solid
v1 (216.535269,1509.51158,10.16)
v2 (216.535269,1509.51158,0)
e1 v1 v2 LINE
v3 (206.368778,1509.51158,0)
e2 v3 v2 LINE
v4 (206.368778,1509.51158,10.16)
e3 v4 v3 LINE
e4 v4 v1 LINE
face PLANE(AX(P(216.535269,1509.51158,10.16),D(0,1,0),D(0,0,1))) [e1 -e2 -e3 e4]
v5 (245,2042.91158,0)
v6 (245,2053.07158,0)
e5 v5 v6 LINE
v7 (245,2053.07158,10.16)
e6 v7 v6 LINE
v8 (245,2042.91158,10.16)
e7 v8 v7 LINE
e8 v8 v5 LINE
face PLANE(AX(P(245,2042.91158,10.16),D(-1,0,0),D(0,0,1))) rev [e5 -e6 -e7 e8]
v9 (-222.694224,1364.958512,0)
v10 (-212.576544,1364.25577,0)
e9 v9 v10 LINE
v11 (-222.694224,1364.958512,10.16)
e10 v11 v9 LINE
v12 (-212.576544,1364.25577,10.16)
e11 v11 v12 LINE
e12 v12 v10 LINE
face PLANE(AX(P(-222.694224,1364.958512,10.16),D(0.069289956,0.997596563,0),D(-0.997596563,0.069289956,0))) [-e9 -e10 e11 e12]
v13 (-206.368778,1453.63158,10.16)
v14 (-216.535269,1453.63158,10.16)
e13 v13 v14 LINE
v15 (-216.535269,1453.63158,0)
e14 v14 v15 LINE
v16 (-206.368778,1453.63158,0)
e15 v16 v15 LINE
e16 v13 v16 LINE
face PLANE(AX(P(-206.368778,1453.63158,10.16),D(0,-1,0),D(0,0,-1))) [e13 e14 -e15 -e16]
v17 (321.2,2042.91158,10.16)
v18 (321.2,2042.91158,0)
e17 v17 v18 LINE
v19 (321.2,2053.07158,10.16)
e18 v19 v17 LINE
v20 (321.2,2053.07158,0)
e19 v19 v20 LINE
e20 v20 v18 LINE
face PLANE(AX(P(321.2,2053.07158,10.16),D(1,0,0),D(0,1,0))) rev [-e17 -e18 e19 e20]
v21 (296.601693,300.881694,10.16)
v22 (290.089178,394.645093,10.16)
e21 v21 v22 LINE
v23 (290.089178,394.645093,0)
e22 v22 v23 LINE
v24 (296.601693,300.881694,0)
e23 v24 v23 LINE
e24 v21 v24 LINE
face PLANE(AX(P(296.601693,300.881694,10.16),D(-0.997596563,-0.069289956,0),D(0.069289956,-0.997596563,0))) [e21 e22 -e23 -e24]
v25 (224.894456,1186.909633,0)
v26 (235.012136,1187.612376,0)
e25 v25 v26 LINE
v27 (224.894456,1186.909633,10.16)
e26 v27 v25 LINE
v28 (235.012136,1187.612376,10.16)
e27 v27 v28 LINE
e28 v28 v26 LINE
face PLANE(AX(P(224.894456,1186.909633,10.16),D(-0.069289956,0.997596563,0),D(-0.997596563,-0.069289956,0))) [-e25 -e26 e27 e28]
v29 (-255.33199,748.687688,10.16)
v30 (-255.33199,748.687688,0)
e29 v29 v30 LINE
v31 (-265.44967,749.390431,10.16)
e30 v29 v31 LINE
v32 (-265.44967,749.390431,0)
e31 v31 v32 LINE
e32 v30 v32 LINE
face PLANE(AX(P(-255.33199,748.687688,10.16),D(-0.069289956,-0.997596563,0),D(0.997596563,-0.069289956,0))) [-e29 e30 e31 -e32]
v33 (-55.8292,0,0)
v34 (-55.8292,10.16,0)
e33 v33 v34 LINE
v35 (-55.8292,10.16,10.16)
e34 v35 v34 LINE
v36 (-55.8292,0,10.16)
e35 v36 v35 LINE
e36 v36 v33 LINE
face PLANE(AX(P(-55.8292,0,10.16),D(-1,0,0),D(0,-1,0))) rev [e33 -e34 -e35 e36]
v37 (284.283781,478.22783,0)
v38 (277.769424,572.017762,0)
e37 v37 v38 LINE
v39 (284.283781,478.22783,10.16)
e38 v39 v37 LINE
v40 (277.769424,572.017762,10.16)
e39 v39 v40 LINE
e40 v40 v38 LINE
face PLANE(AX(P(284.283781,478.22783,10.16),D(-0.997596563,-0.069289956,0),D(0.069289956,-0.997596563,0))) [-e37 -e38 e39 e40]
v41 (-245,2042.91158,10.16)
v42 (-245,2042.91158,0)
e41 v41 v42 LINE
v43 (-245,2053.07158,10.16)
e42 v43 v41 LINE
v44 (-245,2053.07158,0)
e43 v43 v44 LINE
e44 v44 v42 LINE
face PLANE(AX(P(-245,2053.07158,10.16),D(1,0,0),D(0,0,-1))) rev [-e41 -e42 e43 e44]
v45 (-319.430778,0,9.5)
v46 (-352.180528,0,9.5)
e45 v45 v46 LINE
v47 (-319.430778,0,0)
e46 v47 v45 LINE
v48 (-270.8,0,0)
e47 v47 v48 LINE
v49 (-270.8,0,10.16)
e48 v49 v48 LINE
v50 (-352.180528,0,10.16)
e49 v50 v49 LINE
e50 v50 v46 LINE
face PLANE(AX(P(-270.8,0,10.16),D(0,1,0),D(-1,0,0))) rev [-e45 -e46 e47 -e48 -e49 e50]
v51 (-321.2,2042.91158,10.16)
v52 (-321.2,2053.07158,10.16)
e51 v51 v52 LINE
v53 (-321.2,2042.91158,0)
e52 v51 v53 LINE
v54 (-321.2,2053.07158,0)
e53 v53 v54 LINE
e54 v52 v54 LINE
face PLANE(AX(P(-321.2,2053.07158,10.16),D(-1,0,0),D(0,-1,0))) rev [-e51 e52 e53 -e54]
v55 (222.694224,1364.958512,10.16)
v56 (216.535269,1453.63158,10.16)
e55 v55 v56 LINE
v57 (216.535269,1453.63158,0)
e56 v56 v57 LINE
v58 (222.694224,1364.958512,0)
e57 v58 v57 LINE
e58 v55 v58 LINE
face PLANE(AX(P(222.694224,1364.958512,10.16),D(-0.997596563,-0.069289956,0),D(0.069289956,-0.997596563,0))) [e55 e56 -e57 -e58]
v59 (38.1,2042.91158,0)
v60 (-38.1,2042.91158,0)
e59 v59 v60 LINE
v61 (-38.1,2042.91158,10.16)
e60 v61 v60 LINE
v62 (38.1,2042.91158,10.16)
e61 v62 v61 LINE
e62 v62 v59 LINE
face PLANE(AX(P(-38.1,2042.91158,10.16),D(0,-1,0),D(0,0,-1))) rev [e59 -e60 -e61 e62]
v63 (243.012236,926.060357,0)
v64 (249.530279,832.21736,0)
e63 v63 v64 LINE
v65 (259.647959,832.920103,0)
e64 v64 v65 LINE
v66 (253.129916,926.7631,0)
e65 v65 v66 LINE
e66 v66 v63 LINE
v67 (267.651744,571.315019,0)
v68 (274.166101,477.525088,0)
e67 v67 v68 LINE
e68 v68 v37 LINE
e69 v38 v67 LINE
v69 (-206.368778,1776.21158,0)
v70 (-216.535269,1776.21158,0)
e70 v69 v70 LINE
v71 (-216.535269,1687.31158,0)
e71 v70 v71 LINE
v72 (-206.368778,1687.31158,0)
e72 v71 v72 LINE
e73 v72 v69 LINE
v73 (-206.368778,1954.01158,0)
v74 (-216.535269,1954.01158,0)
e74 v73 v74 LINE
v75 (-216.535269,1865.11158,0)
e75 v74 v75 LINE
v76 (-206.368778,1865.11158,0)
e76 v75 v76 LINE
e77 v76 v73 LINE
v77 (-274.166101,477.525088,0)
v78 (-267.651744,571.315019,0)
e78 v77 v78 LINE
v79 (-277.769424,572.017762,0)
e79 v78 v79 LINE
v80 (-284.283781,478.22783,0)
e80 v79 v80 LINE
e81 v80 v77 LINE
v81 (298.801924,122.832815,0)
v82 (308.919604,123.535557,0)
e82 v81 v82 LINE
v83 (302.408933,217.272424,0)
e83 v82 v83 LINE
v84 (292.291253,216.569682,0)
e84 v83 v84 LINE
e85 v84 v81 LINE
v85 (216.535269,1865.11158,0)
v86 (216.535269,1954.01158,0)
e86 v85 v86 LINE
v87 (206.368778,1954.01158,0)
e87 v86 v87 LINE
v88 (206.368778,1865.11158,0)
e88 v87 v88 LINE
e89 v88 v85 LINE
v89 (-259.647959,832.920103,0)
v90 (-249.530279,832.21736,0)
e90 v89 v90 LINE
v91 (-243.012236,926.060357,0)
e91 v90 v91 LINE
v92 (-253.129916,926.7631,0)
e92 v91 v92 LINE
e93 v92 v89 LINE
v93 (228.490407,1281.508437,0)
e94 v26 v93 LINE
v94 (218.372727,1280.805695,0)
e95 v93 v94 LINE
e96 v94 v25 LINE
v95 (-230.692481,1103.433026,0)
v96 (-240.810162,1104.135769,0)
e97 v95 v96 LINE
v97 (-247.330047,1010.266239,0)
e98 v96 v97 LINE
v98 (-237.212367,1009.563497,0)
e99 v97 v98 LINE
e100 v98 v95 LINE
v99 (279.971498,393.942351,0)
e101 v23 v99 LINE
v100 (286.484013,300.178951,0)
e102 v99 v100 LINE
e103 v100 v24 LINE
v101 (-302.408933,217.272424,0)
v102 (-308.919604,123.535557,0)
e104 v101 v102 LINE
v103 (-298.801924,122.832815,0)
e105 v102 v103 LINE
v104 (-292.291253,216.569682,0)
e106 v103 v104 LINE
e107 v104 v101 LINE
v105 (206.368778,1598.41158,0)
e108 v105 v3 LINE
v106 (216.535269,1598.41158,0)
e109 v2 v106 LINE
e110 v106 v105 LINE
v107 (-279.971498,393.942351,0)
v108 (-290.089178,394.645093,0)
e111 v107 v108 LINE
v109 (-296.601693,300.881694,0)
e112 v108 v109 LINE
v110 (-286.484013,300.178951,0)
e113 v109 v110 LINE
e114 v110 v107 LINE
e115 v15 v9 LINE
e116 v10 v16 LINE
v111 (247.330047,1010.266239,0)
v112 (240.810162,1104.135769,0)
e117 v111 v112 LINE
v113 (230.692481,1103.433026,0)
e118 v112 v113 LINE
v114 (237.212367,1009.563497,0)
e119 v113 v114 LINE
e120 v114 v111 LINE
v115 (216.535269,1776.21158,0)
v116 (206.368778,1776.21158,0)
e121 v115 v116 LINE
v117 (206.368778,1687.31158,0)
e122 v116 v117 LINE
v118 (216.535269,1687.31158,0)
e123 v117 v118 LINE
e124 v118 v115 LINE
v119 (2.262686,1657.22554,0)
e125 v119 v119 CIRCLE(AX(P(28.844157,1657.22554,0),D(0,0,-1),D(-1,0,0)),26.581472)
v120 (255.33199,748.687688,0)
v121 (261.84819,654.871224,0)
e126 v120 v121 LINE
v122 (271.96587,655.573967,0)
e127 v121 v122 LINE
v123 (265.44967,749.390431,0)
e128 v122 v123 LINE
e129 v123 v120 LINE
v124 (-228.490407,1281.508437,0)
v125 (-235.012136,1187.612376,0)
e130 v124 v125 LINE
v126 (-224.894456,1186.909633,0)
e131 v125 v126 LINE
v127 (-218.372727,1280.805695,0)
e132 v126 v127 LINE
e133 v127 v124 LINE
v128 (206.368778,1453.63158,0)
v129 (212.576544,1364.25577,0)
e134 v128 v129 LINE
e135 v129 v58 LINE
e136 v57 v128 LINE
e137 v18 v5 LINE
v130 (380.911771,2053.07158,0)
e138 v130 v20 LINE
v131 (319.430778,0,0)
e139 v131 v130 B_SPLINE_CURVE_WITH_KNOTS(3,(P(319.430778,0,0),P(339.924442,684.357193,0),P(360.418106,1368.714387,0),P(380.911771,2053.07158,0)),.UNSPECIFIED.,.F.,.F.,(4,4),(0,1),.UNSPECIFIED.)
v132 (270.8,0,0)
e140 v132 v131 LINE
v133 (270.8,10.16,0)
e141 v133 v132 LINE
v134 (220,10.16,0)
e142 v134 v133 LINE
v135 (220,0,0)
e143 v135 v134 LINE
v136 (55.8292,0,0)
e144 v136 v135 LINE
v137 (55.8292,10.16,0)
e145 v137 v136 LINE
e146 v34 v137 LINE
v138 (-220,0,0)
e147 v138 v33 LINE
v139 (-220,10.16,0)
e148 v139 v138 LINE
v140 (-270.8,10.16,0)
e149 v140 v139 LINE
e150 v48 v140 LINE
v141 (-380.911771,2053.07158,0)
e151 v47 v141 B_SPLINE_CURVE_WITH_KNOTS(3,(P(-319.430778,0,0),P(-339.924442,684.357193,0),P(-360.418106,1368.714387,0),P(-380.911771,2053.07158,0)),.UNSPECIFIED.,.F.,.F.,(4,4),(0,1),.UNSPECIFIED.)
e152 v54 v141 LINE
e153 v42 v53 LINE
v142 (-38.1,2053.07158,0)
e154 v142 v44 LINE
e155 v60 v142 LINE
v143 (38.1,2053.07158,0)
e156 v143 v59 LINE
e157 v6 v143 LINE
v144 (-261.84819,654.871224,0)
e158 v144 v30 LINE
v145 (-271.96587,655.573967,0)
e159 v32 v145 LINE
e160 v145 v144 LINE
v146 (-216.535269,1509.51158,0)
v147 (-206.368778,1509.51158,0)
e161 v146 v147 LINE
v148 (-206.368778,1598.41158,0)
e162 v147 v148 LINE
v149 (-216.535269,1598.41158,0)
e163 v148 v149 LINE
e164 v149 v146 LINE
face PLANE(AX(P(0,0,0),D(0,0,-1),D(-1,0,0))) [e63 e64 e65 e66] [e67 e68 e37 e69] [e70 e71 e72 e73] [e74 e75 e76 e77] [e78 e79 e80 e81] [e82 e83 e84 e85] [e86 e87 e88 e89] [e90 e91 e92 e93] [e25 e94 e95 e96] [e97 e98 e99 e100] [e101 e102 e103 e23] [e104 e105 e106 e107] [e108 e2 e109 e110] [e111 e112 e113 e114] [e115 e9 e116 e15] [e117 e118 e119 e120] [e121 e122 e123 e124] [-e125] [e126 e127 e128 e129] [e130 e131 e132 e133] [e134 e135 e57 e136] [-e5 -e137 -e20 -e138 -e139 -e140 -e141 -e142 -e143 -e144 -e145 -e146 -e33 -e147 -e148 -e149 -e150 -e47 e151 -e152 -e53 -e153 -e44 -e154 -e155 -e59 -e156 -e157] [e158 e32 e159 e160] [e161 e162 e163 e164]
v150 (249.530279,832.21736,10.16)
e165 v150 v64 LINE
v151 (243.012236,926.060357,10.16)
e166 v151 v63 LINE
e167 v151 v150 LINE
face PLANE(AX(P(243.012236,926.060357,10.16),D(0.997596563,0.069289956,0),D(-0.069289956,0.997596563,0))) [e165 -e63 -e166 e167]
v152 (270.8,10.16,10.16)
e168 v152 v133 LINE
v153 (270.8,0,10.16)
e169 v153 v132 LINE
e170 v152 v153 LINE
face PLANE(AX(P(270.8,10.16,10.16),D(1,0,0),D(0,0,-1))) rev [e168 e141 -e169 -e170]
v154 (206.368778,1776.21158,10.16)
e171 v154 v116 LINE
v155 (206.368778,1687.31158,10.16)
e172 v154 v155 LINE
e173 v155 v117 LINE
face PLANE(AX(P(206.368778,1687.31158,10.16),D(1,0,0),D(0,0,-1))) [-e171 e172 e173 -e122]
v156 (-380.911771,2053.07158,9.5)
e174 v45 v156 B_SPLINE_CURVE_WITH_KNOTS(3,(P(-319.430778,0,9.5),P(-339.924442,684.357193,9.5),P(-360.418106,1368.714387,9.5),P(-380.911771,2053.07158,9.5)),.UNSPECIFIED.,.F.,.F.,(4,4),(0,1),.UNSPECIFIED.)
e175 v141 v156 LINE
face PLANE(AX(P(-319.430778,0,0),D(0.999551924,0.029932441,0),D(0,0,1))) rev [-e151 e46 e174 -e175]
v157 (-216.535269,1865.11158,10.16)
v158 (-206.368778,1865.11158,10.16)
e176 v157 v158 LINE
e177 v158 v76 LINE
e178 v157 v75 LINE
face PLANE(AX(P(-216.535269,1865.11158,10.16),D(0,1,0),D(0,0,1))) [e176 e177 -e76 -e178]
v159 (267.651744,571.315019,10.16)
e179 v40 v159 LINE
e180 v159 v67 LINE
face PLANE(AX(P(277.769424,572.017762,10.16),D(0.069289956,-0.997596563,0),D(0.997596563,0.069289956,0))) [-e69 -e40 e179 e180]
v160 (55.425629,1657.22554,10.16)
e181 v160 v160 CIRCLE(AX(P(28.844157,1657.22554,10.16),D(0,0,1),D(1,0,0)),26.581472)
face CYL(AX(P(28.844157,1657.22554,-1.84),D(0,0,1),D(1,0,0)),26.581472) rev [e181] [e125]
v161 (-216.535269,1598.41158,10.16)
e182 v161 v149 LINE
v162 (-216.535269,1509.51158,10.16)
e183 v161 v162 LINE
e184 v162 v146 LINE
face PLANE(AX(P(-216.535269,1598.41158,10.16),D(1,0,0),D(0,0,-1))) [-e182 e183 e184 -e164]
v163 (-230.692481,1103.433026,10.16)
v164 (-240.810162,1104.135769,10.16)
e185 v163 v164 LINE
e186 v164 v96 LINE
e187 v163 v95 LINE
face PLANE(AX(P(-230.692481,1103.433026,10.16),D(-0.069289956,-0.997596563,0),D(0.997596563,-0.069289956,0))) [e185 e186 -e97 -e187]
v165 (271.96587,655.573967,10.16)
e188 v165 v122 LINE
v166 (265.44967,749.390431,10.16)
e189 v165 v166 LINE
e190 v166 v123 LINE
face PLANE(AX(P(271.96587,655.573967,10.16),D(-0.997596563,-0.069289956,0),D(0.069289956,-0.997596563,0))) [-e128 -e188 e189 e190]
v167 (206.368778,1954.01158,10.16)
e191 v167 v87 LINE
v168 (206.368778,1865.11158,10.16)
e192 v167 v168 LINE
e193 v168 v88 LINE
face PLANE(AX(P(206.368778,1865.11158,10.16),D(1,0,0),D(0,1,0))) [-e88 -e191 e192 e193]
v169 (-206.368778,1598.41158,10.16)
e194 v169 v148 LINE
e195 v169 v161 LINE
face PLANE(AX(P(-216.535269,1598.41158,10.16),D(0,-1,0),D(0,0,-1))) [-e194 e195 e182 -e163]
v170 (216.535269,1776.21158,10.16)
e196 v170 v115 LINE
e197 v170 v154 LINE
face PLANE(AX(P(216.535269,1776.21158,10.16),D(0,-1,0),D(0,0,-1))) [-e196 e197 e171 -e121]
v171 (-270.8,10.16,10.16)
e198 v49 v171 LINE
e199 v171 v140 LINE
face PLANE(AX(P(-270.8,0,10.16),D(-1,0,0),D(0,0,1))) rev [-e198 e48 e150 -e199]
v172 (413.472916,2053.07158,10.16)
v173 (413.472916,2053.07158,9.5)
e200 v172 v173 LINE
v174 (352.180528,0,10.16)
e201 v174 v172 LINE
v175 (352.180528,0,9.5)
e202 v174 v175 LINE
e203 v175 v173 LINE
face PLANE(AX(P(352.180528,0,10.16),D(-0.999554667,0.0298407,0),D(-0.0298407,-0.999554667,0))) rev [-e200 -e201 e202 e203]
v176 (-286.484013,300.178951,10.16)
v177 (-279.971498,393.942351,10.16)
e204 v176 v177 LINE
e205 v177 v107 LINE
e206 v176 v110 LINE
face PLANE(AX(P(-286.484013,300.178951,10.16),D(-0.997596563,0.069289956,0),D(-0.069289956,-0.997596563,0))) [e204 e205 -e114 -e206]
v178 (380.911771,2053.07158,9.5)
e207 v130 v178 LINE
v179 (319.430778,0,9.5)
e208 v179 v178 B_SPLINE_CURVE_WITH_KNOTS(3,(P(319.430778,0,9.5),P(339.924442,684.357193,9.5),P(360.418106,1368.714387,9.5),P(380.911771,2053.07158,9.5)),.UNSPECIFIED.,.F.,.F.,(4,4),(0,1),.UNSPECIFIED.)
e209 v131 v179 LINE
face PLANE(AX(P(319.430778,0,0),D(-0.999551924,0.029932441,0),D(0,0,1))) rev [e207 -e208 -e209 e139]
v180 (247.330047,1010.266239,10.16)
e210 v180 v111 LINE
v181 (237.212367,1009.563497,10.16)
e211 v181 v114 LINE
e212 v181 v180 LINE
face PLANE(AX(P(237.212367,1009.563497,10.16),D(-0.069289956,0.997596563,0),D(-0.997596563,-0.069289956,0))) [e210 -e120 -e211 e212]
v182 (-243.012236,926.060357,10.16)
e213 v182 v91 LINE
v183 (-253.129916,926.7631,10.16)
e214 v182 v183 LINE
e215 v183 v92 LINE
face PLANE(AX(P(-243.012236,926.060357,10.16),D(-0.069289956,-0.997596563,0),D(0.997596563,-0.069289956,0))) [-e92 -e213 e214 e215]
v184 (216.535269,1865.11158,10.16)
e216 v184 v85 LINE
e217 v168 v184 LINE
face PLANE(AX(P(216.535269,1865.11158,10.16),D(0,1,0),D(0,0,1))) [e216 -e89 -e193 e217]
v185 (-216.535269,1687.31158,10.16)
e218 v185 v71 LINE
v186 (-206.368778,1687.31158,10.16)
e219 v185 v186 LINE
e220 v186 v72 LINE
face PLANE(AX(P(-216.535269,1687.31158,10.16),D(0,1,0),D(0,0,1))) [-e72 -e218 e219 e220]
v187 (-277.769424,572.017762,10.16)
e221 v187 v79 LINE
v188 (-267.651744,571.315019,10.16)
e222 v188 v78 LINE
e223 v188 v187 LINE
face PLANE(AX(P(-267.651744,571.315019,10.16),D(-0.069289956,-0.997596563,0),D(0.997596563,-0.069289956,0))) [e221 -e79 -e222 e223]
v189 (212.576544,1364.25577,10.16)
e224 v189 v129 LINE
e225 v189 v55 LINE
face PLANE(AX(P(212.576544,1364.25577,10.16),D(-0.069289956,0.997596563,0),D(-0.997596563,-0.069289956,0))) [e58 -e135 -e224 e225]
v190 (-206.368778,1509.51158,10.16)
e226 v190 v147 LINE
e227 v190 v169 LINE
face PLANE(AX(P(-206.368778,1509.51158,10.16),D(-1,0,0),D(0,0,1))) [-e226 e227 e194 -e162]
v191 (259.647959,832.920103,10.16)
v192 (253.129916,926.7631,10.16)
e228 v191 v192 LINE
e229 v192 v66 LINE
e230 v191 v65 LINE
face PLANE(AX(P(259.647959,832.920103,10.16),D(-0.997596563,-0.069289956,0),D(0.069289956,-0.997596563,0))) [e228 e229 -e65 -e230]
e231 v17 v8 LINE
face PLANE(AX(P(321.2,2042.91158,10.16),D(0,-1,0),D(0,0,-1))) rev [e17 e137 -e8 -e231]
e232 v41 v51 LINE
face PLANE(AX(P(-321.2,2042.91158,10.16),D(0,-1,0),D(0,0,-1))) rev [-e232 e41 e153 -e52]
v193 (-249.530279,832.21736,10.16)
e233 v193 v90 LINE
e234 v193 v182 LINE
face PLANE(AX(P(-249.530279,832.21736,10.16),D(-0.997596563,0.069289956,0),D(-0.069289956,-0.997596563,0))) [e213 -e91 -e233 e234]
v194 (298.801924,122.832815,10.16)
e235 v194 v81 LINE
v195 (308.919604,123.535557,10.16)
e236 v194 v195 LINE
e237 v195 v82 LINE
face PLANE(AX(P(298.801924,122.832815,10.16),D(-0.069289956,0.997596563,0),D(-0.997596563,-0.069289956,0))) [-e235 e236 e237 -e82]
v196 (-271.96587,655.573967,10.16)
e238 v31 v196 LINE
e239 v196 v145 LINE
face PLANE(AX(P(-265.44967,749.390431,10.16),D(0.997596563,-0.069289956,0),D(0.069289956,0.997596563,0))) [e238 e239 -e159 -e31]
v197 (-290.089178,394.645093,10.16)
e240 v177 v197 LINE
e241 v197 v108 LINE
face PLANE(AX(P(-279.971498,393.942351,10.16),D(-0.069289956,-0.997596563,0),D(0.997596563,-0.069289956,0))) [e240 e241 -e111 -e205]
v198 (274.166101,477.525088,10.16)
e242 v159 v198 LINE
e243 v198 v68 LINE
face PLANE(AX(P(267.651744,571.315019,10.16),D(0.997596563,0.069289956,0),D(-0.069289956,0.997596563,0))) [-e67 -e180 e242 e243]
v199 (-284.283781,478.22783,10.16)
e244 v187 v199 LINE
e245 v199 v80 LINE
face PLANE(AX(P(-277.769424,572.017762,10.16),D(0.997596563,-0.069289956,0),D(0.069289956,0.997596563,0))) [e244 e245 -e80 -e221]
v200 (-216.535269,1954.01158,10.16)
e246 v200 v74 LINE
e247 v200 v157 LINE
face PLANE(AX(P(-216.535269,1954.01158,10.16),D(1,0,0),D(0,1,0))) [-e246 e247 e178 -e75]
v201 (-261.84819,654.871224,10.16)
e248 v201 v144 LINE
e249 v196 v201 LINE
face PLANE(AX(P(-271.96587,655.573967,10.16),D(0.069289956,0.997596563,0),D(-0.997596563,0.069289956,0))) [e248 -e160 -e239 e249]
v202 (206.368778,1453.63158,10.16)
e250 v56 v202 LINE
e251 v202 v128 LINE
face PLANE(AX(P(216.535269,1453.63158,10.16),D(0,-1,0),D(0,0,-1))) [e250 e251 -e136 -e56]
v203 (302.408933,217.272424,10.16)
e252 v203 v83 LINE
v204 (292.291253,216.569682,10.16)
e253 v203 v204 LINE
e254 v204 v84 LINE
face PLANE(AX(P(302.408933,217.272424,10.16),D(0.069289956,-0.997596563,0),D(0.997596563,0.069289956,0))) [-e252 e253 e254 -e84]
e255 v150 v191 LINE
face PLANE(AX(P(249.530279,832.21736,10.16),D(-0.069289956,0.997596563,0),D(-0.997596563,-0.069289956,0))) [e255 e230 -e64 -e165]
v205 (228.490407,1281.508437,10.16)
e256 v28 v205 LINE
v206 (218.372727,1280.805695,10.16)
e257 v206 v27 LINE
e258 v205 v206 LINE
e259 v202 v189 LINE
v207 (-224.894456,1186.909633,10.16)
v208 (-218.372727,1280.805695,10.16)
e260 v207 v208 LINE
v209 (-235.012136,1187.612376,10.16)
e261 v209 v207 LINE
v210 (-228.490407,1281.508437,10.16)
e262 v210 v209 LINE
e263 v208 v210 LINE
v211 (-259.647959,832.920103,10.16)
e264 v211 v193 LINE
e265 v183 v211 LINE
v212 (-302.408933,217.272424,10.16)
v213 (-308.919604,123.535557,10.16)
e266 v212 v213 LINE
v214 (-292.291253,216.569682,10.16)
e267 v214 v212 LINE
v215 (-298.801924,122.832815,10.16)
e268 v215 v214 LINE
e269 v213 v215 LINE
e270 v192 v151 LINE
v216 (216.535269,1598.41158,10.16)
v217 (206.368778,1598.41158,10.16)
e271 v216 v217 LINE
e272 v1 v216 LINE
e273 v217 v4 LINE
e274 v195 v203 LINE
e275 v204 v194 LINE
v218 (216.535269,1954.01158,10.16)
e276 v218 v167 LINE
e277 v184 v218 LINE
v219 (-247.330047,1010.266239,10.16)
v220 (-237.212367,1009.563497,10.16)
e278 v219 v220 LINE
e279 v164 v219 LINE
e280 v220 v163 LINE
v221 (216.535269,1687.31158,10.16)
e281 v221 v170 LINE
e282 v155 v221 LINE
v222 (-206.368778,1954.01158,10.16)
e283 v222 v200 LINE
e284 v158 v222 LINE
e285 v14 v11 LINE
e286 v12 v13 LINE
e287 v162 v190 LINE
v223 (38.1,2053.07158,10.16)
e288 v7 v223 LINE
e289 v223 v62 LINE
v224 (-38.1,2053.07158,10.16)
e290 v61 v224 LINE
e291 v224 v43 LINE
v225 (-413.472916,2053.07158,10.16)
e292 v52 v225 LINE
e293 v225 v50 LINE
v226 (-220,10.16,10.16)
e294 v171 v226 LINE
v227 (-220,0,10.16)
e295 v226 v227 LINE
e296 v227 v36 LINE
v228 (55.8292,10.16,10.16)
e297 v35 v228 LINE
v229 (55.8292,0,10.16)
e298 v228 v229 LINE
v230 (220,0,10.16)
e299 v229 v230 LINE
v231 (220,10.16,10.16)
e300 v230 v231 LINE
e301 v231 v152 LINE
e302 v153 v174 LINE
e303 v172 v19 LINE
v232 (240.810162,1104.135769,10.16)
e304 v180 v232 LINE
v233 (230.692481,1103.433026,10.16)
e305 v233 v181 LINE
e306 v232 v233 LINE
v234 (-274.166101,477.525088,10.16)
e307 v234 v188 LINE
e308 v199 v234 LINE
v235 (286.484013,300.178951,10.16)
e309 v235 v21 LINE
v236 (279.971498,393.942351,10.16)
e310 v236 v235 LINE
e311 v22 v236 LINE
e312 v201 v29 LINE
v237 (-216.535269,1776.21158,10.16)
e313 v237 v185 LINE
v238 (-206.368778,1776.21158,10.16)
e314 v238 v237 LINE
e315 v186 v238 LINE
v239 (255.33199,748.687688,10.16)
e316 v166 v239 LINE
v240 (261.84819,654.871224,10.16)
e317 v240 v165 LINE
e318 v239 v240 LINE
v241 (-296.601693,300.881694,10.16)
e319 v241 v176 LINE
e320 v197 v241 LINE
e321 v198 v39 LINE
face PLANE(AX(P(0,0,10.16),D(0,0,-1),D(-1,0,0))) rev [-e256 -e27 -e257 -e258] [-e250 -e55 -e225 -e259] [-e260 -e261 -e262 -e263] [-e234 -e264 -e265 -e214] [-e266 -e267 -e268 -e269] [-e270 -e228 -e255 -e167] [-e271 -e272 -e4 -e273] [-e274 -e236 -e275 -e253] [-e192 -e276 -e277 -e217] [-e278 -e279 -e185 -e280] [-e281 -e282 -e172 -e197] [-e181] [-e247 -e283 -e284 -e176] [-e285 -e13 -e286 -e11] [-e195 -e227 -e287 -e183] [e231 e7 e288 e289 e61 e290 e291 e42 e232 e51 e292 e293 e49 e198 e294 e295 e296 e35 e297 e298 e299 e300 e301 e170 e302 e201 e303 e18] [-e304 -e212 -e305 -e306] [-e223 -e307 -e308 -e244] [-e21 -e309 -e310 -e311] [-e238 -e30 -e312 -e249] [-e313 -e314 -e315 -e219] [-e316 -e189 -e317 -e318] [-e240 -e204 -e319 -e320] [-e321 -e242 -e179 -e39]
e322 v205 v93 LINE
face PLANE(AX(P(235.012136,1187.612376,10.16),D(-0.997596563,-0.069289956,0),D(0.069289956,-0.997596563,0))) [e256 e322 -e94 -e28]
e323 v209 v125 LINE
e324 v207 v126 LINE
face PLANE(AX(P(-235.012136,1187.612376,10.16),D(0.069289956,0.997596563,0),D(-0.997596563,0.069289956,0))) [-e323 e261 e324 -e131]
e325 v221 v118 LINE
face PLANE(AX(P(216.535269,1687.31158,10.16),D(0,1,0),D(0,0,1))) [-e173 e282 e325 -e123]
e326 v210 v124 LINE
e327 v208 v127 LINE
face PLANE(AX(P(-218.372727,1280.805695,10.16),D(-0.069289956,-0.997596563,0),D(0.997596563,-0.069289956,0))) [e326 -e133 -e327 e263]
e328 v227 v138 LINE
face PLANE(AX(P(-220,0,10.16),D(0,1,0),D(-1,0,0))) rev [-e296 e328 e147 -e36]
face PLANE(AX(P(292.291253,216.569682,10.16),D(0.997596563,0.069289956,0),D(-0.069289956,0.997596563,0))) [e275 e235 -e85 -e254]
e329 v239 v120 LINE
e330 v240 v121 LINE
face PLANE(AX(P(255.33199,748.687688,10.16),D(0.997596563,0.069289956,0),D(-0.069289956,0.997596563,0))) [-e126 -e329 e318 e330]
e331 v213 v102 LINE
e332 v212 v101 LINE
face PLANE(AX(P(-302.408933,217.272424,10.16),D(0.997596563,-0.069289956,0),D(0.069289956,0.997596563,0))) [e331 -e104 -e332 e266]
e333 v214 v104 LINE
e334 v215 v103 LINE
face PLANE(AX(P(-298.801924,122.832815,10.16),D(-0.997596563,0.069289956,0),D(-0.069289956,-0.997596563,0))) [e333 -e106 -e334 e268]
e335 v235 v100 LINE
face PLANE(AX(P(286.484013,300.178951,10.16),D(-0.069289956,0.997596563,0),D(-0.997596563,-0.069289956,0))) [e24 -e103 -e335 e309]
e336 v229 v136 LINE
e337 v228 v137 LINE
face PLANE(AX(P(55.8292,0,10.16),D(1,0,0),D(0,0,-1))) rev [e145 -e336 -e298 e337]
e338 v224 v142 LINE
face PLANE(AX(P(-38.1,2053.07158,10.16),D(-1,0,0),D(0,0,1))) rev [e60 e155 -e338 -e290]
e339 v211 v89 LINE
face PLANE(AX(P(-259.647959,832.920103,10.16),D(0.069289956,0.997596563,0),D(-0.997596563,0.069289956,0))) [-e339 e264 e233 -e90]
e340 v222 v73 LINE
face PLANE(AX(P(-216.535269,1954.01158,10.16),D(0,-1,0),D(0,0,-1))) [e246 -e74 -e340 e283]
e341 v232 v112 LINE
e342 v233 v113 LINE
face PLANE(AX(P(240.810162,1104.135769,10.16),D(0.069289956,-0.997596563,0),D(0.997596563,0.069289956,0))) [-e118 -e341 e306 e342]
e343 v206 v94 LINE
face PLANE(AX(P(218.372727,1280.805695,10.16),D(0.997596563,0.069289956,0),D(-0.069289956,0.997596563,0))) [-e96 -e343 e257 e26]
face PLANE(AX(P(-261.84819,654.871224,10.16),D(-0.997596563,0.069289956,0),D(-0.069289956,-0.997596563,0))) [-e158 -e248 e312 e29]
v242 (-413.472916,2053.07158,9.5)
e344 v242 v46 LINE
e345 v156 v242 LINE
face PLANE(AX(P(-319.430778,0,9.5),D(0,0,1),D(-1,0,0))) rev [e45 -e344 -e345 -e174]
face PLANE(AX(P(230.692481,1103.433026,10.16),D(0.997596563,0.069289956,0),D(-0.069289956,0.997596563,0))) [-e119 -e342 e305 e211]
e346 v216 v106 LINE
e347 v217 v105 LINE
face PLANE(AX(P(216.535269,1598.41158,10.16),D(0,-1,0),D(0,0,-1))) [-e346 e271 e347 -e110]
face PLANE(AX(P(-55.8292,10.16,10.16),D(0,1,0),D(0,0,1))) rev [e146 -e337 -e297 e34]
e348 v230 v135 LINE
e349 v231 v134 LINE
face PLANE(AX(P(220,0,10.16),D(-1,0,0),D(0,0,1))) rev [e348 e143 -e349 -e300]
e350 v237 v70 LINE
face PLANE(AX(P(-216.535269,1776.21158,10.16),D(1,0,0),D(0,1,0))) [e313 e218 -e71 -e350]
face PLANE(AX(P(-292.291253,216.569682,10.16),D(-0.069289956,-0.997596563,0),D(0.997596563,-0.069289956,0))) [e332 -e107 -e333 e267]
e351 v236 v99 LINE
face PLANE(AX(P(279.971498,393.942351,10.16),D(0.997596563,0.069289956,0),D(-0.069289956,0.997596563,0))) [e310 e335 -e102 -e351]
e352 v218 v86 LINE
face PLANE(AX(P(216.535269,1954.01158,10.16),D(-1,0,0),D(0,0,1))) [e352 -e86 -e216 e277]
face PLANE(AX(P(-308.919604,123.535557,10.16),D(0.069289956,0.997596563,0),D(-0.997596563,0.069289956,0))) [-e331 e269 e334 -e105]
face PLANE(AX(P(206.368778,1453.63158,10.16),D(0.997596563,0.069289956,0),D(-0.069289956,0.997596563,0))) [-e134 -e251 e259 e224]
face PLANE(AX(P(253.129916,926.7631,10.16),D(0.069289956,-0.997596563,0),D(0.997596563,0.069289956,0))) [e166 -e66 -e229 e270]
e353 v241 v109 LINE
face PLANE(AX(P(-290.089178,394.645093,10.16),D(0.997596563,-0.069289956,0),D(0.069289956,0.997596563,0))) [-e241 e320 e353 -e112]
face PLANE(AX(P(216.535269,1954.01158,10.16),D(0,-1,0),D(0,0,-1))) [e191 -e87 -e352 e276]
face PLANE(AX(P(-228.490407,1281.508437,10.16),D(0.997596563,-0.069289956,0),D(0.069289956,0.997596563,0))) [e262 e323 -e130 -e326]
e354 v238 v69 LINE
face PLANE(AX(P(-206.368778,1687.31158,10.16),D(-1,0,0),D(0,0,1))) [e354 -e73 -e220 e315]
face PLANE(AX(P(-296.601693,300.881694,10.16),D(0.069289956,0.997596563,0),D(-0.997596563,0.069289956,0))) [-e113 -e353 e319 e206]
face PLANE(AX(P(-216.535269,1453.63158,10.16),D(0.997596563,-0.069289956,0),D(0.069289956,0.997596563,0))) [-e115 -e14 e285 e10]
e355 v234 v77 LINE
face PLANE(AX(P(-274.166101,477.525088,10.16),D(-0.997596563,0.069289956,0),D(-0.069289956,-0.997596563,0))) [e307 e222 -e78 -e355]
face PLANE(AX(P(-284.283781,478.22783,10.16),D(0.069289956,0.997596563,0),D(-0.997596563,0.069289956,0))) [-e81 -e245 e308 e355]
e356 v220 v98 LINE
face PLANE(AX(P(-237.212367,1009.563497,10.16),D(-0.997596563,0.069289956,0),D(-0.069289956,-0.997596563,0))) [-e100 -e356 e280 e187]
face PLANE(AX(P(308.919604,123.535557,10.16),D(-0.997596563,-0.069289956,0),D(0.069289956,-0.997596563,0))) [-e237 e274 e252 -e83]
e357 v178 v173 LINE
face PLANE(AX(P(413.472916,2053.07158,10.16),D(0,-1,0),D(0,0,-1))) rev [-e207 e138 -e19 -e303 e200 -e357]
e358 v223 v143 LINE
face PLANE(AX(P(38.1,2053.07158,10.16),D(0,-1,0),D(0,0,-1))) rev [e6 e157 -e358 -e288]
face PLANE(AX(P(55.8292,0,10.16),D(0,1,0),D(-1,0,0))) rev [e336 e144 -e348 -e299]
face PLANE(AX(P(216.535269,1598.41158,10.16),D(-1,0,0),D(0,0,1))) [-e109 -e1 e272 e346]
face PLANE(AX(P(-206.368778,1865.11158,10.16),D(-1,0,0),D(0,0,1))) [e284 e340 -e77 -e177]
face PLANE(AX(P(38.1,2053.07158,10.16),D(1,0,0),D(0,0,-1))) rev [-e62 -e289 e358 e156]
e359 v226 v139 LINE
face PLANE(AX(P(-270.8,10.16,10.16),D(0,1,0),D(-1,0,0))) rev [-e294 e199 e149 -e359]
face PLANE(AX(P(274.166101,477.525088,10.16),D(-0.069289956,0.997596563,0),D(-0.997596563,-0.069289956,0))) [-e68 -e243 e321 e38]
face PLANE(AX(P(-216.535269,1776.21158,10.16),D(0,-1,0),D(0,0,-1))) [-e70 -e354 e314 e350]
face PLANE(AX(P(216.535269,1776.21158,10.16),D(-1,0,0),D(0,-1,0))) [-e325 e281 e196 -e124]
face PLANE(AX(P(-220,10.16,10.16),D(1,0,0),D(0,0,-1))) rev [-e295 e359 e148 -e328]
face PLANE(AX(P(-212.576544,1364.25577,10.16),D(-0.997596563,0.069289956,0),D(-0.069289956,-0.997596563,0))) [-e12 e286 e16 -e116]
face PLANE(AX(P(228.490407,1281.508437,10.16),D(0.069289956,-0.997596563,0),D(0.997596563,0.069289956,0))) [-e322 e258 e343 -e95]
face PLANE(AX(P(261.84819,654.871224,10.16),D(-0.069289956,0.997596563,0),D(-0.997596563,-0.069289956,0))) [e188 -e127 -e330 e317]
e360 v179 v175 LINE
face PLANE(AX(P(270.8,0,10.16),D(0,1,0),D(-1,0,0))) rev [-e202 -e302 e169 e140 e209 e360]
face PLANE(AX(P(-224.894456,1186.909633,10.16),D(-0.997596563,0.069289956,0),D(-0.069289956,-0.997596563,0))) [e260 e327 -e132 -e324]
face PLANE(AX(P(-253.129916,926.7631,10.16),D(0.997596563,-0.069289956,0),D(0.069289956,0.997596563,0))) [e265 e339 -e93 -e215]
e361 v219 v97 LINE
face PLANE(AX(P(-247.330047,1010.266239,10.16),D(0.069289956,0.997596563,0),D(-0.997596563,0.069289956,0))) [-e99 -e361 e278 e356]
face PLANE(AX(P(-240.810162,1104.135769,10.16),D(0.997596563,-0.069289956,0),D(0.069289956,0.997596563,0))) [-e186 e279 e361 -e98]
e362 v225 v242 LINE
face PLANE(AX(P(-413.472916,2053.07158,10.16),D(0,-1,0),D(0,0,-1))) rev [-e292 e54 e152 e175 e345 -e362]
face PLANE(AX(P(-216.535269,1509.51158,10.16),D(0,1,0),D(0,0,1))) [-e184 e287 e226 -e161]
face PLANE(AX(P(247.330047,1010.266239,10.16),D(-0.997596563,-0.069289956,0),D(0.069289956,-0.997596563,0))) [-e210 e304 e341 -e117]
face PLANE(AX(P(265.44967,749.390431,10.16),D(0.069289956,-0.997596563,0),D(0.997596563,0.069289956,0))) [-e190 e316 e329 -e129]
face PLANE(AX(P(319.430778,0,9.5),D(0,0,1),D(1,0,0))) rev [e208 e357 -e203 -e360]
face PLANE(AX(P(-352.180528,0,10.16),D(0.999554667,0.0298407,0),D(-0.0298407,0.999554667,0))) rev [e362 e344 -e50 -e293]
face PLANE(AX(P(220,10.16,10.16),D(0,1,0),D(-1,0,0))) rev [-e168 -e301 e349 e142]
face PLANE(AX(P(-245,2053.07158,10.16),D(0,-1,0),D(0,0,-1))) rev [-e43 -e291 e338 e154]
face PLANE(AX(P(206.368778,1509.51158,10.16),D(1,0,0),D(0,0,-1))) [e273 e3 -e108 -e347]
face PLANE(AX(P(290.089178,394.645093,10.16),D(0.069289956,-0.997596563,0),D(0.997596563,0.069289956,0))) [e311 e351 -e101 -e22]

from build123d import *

# Parameters (mm, degrees)
SKETCH1_W           = 10.166490401
SKETCH1_H           = 88.9
BOSS_EXTRUDE1_DEPTH = 10.16
CUT_LOFT1_DEPTH     = 9.5
SKETCH6_R           = 26.581471798
CUT_EXTRUDE2_DEPTH  = 12


# Read off the part's stored shape, not the designer's step: Cut-Loft1
with BuildPart() as part:
    # Sketch1 → Boss-Extrude1 (new body)
    with BuildSketch(Plane.XY):
        Polygon((-245, 2053.071580455), (-245, 2042.911580455), (-321.2, 2042.911580455), (-321.2, 2053.071580455), (-413.472915973, 2053.071580455), (-352.180527886, 0), (-270.8, 0), (-270.8, 10.16), (-220, 10.16), (-220, 0), (-55.8292, 0), (-55.8292, 10.16), (55.8292, 10.16), (55.8292, 0), (220, 0), (220, 10.16), (270.8, 10.16), (270.8, 0), (352.180527886, 0), (413.472915973, 2053.071580455), (321.2, 2053.071580455), (321.2, 2042.911580455), (245, 2042.911580455), (245, 2053.071580455), (38.1, 2053.071580455), (38.1, 2042.911580455), (-38.1, 2042.911580455), (-38.1, 2053.071580455), align=None)
        with Locations((-211.45202358, 1909.561580455)):
            Rectangle(SKETCH1_W, SKETCH1_H, mode=Mode.SUBTRACT)
        with Locations((-211.45202358, 1731.761580455)):
            Rectangle(SKETCH1_W, SKETCH1_H, mode=Mode.SUBTRACT)
        Polygon((-298.801924037, 122.832814726), (-292.291252627, 216.569681682), (-302.408932711, 217.272424291), (-308.919604121, 123.535557335), align=None, mode=Mode.SUBTRACT)
        Polygon((-286.484012658, 300.178951146), (-279.971498388, 393.942350533), (-290.089178472, 394.645093142), (-296.601692742, 300.881693756), align=None, mode=Mode.SUBTRACT)
        Polygon((-274.16610128, 477.525087567), (-267.651744149, 571.315019385), (-277.769424233, 572.017761994), (-284.283781364, 478.227830176), align=None, mode=Mode.SUBTRACT)
        Polygon((-261.848189901, 654.871223988), (-255.33198991, 748.687688236), (-265.449669994, 749.390430845), (-271.965869985, 655.573966597), align=None, mode=Mode.SUBTRACT)
        Polygon((-249.530278522, 832.217360408), (-243.012235672, 926.060357088), (-253.129915756, 926.763099697), (-259.647958606, 832.920103017), align=None, mode=Mode.SUBTRACT)
        Polygon((-237.212367144, 1009.563496829), (-230.692481433, 1103.433025939), (-240.810161517, 1104.135768548), (-247.330047228, 1010.266239438), align=None, mode=Mode.SUBTRACT)
        Polygon((-224.894455765, 1186.909633249), (-218.372727194, 1280.805694791), (-228.490407278, 1281.5084374), (-235.012135849, 1187.612375858), align=None, mode=Mode.SUBTRACT)
        Polygon((-206.36877838, 1453.631580489), (-216.535268781, 1453.631580489), (-222.69422447, 1364.958512279), (-212.576544386, 1364.25576967), align=None, mode=Mode.SUBTRACT)
        Polygon((216.535268781, 1453.631580489), (206.36877838, 1453.631580489), (212.576544386, 1364.25576967), (222.69422447, 1364.958512279), align=None, mode=Mode.SUBTRACT)
        Polygon((218.372727194, 1280.805694791), (224.894455765, 1186.909633249), (235.012135849, 1187.612375858), (228.490407278, 1281.5084374), align=None, mode=Mode.SUBTRACT)
        Polygon((230.692481433, 1103.433025939), (237.212367144, 1009.563496829), (247.330047228, 1010.266239438), (240.810161517, 1104.135768548), align=None, mode=Mode.SUBTRACT)
        Polygon((243.012235672, 926.060357088), (249.530278522, 832.217360408), (259.647958606, 832.920103017), (253.129915756, 926.763099697), align=None, mode=Mode.SUBTRACT)
        Polygon((255.33198991, 748.687688236), (261.848189901, 654.871223988), (271.965869985, 655.573966597), (265.449669994, 749.390430845), align=None, mode=Mode.SUBTRACT)
        Polygon((267.651744149, 571.315019385), (274.16610128, 477.525087567), (284.283781364, 478.227830176), (277.769424233, 572.017761994), align=None, mode=Mode.SUBTRACT)
        Polygon((279.971498388, 393.942350533), (286.484012658, 300.178951146), (296.601692742, 300.881693756), (290.089178472, 394.645093142), align=None, mode=Mode.SUBTRACT)
        Polygon((292.291252627, 216.569681682), (298.801924037, 122.832814726), (308.919604121, 123.535557335), (302.408932711, 217.272424291), align=None, mode=Mode.SUBTRACT)
        with Locations((211.45202358, 1731.761580455)):
            Rectangle(SKETCH1_W, SKETCH1_H, mode=Mode.SUBTRACT)
        with Locations((-211.45202358, 1553.961580455)):
            Rectangle(SKETCH1_W, SKETCH1_H, mode=Mode.SUBTRACT)
        with Locations((211.45202358, 1553.961580455)):
            Rectangle(SKETCH1_W, SKETCH1_H, mode=Mode.SUBTRACT)
        with Locations((211.45202358, 1909.561580455)):
            Rectangle(SKETCH1_W, SKETCH1_H, mode=Mode.SUBTRACT)
    extrude(amount=BOSS_EXTRUDE1_DEPTH)

    # Cut-Loft1 outline → Cut-Loft1 (cut)
    with BuildSketch(Plane.XY):
        Polygon((413.472915973, 2053.071580455), (380.911770747, 2053.071580455), (319.430777619, 0), (352.180527886, 0), align=None)
    cut_loft1 = extrude(amount=CUT_LOFT1_DEPTH, mode=Mode.SUBTRACT)

    # Mirror1: Cut-Loft1 across plane
    add(cut_loft1.mirror(Plane(origin=(0, 0, 0), x_dir=(0, 0, 1), z_dir=(1, 0, 0))), mode=Mode.SUBTRACT)

    # Sketch6 → Cut-Extrude2 (cut)
    with BuildSketch(Plane.XY.offset(10.16)):
        with Locations((28.844157405, 1657.225539641)):
            Circle(SKETCH6_R)
    extrude(amount=-CUT_EXTRUDE2_DEPTH, mode=Mode.SUBTRACT)


solid = part.part
